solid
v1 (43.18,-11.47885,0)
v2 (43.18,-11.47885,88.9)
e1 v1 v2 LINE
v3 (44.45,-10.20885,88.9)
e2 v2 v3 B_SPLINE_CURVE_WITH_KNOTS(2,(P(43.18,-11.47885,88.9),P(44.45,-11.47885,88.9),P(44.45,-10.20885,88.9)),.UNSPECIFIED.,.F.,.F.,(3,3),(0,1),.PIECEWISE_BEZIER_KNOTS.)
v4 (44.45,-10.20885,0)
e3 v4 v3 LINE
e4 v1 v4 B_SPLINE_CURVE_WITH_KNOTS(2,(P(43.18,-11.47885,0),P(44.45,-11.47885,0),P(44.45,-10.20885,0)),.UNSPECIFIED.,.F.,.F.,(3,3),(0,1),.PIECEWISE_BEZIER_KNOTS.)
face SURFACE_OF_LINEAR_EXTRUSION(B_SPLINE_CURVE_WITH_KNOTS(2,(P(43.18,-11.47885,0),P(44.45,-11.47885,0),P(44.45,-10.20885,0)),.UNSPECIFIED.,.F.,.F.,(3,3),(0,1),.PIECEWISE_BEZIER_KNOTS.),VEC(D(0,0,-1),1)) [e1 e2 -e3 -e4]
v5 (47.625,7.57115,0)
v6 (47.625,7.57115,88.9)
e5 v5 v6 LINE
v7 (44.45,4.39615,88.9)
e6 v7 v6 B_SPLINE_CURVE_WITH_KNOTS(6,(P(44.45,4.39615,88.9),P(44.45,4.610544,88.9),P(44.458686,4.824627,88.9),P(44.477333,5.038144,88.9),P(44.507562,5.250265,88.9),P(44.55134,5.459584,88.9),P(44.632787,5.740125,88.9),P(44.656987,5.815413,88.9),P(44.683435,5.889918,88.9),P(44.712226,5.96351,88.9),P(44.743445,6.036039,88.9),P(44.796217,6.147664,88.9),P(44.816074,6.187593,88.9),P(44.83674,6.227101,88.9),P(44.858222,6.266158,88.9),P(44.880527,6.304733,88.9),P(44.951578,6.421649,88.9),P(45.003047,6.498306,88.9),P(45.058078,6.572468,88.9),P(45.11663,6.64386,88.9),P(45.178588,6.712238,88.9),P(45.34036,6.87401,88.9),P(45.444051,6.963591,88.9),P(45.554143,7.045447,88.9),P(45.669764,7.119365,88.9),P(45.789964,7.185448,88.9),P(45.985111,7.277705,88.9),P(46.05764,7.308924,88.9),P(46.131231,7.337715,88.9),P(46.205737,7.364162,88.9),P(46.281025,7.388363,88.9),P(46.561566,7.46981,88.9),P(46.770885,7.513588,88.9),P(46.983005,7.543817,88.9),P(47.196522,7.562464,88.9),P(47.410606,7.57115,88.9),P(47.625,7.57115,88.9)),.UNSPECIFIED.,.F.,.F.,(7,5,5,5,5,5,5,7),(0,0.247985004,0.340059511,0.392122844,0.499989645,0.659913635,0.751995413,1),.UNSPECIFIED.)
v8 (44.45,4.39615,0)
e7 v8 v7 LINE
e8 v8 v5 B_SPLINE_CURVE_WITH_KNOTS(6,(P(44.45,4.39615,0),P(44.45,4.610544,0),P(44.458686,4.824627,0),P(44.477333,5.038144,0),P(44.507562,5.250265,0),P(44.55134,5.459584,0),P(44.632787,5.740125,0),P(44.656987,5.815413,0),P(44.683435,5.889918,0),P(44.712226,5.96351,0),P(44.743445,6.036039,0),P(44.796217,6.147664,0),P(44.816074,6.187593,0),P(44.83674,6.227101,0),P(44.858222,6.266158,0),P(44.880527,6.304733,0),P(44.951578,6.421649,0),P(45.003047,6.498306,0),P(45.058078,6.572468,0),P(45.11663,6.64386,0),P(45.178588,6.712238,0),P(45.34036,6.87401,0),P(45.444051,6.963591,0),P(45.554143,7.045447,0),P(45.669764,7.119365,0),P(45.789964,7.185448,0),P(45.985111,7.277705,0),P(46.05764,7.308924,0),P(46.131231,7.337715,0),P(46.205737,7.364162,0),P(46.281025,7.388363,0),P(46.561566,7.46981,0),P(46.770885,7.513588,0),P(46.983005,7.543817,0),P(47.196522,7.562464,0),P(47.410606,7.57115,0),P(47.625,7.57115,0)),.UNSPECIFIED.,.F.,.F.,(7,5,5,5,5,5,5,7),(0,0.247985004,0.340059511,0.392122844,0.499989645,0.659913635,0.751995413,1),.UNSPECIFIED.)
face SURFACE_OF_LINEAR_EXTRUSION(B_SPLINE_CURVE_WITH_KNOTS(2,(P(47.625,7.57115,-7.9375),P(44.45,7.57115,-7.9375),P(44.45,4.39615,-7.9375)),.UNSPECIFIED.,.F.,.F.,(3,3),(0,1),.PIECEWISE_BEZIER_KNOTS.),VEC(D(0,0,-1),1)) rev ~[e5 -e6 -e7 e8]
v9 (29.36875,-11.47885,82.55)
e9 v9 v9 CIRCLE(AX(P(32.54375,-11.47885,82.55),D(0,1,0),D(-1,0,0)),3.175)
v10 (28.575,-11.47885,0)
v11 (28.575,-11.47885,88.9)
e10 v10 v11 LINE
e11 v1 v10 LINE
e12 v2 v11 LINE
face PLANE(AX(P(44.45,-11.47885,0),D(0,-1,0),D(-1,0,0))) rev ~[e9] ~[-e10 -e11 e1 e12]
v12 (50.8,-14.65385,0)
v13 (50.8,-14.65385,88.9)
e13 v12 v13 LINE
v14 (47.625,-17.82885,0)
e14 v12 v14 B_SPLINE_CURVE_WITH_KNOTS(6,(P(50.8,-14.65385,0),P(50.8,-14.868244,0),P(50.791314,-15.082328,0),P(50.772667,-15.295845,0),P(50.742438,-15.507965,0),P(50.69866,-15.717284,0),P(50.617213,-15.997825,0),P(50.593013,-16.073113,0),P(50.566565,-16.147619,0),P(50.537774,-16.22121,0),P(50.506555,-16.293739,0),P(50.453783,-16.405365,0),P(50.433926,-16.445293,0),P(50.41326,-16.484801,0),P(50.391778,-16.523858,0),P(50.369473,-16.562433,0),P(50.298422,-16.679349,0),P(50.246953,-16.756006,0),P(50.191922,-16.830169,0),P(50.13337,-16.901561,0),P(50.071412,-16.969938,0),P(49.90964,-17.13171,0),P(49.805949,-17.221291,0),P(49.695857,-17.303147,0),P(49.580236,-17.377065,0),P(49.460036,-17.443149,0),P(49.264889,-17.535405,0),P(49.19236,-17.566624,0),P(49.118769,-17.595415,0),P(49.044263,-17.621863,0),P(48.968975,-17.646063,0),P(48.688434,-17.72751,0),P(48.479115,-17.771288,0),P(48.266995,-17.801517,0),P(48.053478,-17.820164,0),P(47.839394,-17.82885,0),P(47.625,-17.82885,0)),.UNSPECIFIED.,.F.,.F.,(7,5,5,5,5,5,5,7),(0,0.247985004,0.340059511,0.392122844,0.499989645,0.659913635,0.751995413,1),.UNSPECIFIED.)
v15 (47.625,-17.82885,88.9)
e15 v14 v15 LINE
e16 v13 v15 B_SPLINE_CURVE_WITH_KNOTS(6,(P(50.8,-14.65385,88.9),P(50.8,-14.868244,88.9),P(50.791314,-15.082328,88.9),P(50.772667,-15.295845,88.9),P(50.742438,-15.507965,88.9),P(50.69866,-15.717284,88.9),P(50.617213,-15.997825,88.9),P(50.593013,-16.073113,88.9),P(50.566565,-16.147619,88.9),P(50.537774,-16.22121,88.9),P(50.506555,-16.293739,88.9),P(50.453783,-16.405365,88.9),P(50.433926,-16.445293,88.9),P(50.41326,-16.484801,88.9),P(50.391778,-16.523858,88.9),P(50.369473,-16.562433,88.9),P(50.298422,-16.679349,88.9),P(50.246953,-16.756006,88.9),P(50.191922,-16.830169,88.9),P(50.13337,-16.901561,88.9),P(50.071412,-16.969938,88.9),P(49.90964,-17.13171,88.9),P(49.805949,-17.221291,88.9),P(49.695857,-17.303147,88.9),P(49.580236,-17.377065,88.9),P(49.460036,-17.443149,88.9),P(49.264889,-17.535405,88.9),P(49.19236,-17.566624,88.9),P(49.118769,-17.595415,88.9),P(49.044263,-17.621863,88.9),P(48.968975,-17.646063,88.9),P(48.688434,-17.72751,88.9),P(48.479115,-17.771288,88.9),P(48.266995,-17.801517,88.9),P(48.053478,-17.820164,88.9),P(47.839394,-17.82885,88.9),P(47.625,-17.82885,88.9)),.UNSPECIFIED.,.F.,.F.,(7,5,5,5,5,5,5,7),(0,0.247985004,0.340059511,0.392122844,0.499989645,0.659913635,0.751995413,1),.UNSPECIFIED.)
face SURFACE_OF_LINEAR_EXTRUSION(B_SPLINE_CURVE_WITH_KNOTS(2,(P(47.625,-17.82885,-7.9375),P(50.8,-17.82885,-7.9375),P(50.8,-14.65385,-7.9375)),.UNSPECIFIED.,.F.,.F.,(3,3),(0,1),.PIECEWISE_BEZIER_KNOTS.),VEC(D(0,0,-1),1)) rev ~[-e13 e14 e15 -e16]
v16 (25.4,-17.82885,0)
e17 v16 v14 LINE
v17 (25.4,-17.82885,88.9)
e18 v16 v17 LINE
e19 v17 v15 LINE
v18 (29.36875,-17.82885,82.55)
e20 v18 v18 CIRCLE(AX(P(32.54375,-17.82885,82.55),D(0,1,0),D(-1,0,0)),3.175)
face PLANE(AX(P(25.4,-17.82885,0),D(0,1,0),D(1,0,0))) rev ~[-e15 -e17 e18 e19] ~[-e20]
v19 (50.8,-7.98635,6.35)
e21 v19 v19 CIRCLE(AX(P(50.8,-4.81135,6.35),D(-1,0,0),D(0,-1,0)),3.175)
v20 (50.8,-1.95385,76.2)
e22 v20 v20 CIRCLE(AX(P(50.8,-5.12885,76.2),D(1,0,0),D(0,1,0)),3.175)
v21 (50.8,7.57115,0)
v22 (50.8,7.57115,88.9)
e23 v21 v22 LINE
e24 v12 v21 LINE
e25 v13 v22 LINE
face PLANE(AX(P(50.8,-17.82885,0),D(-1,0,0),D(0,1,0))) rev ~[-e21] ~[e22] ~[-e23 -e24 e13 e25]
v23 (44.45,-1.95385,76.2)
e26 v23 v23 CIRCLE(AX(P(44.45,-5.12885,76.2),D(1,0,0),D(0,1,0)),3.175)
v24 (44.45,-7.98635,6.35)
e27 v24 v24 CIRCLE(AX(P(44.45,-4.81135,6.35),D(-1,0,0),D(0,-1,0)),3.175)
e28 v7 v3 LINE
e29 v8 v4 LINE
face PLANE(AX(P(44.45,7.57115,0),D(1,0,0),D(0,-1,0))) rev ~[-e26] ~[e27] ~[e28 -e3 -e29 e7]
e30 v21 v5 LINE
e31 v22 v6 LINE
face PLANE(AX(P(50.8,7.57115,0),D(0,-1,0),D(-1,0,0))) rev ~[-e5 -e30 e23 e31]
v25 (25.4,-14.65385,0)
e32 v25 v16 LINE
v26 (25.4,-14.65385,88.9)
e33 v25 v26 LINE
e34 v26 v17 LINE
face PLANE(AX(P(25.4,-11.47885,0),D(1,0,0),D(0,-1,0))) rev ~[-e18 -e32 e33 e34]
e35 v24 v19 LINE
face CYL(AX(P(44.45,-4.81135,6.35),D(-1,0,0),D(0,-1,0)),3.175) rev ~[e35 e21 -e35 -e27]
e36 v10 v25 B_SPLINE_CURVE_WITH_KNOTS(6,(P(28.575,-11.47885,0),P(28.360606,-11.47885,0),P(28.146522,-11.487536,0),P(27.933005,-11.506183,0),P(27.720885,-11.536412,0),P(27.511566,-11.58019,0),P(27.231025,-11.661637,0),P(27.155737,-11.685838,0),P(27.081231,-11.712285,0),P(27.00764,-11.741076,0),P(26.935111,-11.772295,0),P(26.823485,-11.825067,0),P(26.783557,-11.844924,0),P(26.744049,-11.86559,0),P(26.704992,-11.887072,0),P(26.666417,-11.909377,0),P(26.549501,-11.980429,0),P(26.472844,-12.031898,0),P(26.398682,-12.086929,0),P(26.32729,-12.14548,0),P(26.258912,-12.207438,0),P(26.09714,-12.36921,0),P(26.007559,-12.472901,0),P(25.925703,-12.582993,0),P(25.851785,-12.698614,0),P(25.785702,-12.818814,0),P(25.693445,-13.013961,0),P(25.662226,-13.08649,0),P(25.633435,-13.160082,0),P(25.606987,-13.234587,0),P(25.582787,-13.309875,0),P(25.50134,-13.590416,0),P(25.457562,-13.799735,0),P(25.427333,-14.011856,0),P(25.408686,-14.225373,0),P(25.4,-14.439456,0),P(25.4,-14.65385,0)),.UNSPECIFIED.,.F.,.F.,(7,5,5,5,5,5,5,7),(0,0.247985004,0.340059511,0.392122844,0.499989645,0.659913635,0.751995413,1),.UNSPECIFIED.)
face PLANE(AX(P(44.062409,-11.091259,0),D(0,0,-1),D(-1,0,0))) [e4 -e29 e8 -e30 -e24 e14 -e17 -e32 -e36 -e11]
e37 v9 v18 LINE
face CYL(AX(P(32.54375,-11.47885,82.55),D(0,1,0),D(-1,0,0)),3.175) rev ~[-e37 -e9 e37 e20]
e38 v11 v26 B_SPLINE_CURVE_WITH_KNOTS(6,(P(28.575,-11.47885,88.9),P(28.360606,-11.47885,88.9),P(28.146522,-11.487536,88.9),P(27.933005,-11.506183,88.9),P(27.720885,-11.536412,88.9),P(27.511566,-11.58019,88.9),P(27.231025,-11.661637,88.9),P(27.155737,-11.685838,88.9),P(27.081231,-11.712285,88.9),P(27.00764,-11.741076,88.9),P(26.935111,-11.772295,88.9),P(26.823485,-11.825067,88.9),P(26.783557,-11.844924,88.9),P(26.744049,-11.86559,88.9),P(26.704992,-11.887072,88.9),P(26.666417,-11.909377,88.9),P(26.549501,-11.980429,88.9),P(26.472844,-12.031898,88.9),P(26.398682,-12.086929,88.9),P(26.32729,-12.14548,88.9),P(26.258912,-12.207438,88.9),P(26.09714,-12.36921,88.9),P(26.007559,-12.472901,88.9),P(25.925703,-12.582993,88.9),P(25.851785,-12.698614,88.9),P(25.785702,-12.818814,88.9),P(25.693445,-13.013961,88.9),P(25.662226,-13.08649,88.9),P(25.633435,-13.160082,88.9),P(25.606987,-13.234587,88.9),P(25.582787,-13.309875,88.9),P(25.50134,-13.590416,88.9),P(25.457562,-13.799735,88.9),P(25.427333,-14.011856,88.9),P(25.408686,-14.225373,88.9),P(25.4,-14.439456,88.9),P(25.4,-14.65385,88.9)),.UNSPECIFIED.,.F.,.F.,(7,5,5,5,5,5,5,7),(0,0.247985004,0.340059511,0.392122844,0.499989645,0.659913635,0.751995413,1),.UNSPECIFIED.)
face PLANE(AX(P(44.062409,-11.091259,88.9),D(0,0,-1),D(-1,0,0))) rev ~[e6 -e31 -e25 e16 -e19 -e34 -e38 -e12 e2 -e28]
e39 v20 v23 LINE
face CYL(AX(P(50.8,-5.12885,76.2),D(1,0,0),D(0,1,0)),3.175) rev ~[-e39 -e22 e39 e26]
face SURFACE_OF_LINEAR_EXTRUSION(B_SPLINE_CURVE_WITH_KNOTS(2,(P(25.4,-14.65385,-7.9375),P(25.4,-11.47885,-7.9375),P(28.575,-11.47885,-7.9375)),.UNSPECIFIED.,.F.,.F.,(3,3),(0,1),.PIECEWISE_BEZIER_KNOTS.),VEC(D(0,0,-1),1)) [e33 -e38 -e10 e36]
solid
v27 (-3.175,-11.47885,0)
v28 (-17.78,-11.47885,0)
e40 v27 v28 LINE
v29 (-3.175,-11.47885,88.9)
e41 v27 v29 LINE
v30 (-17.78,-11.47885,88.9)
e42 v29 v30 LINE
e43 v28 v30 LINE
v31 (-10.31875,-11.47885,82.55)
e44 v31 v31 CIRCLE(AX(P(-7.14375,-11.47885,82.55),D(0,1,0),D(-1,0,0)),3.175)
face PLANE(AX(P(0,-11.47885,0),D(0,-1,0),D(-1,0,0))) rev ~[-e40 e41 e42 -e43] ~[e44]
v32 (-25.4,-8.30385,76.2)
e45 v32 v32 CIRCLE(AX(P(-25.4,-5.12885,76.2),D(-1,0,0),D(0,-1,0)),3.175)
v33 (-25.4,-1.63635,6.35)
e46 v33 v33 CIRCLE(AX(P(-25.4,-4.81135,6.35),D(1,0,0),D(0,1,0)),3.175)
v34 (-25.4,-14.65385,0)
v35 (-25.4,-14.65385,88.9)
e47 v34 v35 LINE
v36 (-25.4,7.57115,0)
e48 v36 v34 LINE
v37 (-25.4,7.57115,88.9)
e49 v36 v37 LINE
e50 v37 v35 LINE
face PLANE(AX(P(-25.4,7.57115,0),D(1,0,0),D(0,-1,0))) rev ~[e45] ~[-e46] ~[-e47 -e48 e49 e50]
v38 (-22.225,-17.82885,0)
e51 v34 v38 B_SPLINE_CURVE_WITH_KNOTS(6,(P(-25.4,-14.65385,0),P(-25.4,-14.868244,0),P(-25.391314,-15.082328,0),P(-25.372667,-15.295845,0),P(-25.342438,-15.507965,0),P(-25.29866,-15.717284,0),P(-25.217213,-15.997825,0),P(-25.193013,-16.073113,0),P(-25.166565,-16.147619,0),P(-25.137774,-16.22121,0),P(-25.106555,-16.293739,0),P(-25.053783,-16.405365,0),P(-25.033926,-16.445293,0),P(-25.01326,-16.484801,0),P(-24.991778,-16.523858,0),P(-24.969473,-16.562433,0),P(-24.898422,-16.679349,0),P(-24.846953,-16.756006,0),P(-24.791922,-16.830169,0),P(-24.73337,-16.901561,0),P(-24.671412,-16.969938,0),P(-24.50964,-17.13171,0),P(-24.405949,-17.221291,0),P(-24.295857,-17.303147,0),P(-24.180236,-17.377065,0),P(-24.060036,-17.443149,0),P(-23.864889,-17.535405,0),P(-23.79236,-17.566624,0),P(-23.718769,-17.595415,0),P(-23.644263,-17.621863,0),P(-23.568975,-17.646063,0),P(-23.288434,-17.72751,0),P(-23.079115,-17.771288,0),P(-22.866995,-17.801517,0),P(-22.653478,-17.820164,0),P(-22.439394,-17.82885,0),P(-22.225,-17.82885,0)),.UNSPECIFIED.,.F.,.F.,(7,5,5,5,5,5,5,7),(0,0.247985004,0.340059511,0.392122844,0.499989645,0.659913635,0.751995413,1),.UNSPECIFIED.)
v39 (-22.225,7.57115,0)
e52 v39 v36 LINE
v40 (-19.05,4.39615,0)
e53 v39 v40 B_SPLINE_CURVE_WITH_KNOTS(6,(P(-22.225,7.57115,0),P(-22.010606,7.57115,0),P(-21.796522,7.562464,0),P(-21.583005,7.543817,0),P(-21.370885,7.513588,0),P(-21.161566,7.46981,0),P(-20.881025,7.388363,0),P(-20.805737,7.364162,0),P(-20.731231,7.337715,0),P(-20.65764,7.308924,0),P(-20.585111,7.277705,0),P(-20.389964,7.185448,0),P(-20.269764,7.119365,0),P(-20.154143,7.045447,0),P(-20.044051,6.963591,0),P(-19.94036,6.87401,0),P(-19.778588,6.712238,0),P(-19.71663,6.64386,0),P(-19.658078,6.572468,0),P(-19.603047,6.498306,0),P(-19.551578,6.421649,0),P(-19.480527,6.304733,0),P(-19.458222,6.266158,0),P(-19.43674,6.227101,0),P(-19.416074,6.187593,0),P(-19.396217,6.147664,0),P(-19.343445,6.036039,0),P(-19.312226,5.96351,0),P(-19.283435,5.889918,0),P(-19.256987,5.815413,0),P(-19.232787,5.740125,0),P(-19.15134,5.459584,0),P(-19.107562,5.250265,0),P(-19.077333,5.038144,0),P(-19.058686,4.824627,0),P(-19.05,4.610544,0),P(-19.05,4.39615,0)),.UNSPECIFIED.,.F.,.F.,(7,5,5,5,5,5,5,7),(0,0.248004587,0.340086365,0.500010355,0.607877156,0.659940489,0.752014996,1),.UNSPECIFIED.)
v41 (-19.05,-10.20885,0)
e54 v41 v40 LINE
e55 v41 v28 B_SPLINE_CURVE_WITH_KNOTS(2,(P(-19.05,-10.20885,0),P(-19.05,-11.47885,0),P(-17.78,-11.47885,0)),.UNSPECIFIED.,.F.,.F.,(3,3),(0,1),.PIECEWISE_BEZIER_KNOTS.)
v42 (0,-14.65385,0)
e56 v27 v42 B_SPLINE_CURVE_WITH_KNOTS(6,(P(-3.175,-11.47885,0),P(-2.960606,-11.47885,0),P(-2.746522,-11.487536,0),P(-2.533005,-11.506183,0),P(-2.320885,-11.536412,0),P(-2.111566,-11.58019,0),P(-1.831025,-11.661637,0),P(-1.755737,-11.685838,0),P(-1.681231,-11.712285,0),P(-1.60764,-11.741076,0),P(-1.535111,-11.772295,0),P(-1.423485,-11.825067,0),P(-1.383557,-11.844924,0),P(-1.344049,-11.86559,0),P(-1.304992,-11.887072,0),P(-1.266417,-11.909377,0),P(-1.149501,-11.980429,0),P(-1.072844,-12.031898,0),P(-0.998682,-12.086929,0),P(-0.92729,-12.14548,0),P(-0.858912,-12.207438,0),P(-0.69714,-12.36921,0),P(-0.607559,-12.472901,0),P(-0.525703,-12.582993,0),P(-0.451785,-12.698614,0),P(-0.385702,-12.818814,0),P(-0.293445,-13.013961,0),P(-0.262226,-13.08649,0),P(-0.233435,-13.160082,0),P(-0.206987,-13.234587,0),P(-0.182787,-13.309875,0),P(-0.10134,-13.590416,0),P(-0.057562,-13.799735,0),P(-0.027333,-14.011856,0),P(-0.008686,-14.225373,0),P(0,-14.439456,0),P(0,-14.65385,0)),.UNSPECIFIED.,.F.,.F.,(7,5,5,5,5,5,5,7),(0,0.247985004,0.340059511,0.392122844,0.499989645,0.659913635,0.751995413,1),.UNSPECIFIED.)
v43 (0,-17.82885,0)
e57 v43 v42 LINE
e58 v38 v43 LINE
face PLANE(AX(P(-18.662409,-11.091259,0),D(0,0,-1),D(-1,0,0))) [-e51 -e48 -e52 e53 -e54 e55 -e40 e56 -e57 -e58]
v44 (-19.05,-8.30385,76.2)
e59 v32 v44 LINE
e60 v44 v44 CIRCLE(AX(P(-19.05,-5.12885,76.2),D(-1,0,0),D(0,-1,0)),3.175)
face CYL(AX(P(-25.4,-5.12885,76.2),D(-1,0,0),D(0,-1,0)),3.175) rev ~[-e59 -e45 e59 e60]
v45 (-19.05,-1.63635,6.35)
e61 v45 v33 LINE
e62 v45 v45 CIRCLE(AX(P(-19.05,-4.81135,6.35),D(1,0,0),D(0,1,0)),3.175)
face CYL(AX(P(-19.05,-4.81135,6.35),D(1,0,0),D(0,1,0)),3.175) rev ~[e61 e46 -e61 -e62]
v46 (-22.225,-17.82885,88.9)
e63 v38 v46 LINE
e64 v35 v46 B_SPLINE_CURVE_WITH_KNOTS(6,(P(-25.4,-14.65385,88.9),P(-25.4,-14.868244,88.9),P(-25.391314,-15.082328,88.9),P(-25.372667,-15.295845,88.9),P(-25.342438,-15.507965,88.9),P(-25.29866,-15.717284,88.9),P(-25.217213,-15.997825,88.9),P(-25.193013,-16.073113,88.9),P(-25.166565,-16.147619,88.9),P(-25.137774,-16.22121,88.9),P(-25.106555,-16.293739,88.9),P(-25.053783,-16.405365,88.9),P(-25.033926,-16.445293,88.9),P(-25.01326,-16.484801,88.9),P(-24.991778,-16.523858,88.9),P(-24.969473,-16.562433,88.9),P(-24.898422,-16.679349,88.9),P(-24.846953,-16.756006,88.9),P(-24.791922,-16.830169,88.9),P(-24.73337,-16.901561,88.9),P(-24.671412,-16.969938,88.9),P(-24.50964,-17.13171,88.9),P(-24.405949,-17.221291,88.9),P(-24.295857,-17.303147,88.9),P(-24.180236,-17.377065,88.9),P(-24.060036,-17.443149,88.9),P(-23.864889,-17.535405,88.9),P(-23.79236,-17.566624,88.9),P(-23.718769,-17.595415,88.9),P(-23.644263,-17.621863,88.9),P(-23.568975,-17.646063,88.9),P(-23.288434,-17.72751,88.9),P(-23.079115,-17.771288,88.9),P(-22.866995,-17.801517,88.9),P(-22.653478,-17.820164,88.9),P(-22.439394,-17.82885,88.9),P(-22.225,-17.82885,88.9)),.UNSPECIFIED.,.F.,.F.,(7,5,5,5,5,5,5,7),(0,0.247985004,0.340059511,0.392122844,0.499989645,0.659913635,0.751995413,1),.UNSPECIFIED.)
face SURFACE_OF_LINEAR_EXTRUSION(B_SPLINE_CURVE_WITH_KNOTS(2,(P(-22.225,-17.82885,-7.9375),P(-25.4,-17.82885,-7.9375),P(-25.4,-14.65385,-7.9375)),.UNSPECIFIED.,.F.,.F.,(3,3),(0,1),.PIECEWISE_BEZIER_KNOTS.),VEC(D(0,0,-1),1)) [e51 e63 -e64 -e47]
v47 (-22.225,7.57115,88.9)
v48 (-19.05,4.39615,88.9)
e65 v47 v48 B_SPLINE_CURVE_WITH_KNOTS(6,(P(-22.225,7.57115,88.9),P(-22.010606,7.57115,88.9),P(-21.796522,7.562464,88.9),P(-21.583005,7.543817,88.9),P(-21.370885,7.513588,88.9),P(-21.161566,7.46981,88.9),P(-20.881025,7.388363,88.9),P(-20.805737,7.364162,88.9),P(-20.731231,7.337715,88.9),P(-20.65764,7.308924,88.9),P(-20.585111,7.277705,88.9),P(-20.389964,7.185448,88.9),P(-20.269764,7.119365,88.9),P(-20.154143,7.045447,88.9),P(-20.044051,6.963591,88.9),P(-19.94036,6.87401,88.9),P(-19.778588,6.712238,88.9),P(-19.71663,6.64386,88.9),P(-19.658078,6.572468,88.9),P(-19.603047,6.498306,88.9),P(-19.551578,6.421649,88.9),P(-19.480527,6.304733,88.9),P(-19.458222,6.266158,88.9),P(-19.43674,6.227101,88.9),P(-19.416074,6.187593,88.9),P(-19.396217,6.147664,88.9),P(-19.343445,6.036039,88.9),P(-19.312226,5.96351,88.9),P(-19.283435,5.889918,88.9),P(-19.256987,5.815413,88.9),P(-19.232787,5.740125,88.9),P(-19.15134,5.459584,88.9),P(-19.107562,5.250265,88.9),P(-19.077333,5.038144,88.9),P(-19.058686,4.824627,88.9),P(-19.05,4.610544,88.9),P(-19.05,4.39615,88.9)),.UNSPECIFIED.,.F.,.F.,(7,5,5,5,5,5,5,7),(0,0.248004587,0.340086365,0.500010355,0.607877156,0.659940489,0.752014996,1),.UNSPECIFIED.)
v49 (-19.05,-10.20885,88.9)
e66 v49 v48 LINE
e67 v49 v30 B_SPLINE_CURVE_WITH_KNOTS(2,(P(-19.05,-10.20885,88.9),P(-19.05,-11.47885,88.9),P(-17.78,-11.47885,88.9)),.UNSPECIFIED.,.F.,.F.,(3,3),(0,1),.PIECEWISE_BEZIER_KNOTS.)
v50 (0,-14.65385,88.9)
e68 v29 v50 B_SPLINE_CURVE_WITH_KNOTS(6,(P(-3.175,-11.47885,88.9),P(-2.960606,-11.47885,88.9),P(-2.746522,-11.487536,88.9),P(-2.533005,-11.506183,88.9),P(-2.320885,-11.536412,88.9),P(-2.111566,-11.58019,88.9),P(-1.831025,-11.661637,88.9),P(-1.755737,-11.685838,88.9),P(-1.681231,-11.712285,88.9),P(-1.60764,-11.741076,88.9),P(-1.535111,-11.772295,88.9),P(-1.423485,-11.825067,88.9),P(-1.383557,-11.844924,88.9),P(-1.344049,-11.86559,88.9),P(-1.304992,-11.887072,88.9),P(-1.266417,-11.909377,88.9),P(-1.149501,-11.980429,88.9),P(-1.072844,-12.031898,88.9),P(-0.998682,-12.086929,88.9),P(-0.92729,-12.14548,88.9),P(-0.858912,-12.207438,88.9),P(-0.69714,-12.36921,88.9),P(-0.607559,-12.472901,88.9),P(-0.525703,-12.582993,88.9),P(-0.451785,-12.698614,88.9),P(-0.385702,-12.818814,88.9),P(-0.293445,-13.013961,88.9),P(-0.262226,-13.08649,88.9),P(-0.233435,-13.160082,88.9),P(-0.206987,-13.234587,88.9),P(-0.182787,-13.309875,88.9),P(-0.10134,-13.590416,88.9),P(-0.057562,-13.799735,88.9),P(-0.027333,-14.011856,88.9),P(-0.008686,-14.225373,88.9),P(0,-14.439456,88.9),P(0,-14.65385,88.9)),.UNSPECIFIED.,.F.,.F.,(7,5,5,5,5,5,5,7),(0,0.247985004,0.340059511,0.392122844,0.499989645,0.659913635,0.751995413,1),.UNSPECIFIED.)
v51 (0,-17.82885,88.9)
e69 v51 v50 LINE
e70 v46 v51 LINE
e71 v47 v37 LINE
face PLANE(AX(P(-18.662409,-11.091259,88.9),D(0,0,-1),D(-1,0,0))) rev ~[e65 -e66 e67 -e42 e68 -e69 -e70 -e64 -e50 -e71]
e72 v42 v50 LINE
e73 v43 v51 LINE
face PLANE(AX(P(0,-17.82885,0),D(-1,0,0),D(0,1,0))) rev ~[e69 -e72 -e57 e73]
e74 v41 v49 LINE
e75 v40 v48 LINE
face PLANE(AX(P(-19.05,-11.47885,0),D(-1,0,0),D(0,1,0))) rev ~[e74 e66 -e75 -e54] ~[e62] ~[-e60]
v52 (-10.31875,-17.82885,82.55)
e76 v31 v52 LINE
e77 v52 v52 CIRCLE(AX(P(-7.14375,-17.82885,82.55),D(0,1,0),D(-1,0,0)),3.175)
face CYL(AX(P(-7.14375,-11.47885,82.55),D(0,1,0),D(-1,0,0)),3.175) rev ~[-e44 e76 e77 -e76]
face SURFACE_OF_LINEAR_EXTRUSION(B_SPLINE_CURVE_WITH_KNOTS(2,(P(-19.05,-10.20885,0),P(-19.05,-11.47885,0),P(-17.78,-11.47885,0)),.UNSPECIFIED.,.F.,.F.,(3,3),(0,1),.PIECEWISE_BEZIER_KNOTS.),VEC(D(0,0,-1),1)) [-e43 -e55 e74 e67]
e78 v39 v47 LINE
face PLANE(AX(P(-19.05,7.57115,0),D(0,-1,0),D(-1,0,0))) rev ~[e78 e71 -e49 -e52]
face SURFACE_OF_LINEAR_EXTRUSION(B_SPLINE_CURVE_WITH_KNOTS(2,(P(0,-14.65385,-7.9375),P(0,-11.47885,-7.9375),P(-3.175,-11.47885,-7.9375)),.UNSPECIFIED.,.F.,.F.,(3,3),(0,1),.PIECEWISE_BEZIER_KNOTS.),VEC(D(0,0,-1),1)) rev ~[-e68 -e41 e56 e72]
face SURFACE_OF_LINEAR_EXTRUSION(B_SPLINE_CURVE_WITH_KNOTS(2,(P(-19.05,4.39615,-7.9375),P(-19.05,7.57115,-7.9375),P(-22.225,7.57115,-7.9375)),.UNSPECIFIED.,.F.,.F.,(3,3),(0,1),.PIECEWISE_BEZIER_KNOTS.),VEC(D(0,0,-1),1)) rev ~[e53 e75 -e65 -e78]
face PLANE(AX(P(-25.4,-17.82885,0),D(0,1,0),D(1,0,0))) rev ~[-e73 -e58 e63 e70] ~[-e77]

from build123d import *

# Parameters (mm, degrees)
F1_DEPTH      = 88.9
F2_T1_DEPTH   = 104.775
F3_T1_DEPTH   = 104.775
F5_DEPTH      = 88.9
F6_T1_DEPTH   = 104.775
F7_T1_DEPTH   = 88.9
F7_2_T1_DEPTH = 88.9
F8_T1_DEPTH   = 104.775
F10_R         = 3.175
F11_DEPTH     = 6.35
F9_R          = 3.175
F12_DEPTH     = 6.35
F14_R         = 3.175
F15_DEPTH     = 6.35
F13_R         = 3.175
F16_DEPTH     = 6.35
F17_R         = 3.175
F19_DEPTH     = 6.35
F18_R         = 3.175
F20_DEPTH     = 6.35


# Not quite as in the source:
# - a fillet or chamfer that OpenCascade refuses, or shapes differently, is made with other operations: its cross-section is extruded or revolved along the edge and cut away or added


with BuildPart() as f1:
    # F0 (on Top) → F1 (new body)
    with BuildSketch(Plane.XY):
        Polygon((-19.05, -11.4788501549), (-19.05, 7.5711498451), (-25.4, 7.5711498451), (-25.4, -17.8288501549), (0, -17.8288501549), (0, -11.4788501549), align=None)
    extrude(amount=F1_DEPTH)

    # F2: fillet of radius 3.175 on 2 edges, made by hand

    # F2_s2 → F2_t1 (cut)
    with BuildSketch(Plane.XY.offset(-7.9375)):
        with BuildLine():
            add(Edge.make_bspline(
                [(-19.05, 4.3961498451), (-19.05, 7.5711498451), (-22.225, 7.5711498451)],
                knots=[0, 0, 0, 1, 1, 1], degree=2, weights=[1, 1, 1]))
            Line((-22.225, 7.5711498451), (-19.05, 7.5711498451))
            Line((-19.05, 7.5711498451), (-19.05, 4.3961498451))
        make_face()
        with BuildLine():
            add(Edge.make_bspline(
                [(0, -14.6538501549), (0, -11.4788501549), (-3.175, -11.4788501549)],
                knots=[0, 0, 0, 1, 1, 1], degree=2, weights=[1, 1, 1]))
            Line((-3.175, -11.4788501549), (0, -11.4788501549))
            Line((0, -11.4788501549), (0, -14.6538501549))
        make_face()
    extrude(amount=F2_T1_DEPTH, mode=Mode.SUBTRACT)

    # F3: fillet of radius 3.175 on 1 edges, made by hand

    # F3_s2 → F3_t1 (cut)
    with BuildSketch(Plane.XY.offset(-7.9375)):
        with BuildLine():
            add(Edge.make_bspline(
                [(-22.225, -17.8288501549), (-25.4, -17.8288501549), (-25.4, -14.6538501549)],
                knots=[0, 0, 0, 1, 1, 1], degree=2, weights=[1, 1, 1]))
            Line((-25.4, -14.6538501549), (-25.4, -17.8288501549))
            Line((-25.4, -17.8288501549), (-22.225, -17.8288501549))
        make_face()
    extrude(amount=F3_T1_DEPTH, mode=Mode.SUBTRACT)

    # F7#2: fillet of radius 1.27 on 1 edges, made by hand

    # F7_2_s2 → F7_2_t1 (join)
    with BuildSketch(Plane.XY):
        with BuildLine():
            add(Edge.make_bspline(
                [(-19.05, -10.2088501549), (-19.05, -11.4788501549), (-17.78, -11.4788501549)],
                knots=[0, 0, 0, 1, 1, 1], degree=2, weights=[1, 1, 1]))
            Line((-17.78, -11.4788501549), (-19.05, -11.4788501549))
            Line((-19.05, -11.4788501549), (-19.05, -10.2088501549))
        make_face()
    extrude(amount=F7_2_T1_DEPTH)

    # F9 (on face) → F12 (cut)
    with BuildSketch(Plane.YZ.offset(-19.05)):
        with Locations((-4.8113501549, 6.35)):
            Circle(F9_R)
    extrude(amount=-F12_DEPTH, mode=Mode.SUBTRACT)

    # F14 (on face) → F15 (cut)
    with BuildSketch(Plane(origin=(-25.4, 0, 0), x_dir=(0, -1, 0), z_dir=(-1, 0, 0))):
        with Locations((5.1288501549, 76.2)):
            Circle(F14_R)
    extrude(amount=-F15_DEPTH, mode=Mode.SUBTRACT)

    # F18 (on face) → F20 (cut)
    with BuildSketch(Plane(origin=(0, -11.4788501549, 0), x_dir=(-1, 0, 0), z_dir=(0, 1, 0))):
        with Locations((7.14375, 82.55)):
            Circle(F18_R)
    extrude(amount=-F20_DEPTH, mode=Mode.SUBTRACT)


with BuildPart() as f5:
    # F4 (on Top) → F5 (new body)
    with BuildSketch(Plane.XY):
        Polygon((25.4, -11.4788501549), (25.4, -17.8288501549), (50.8, -17.8288501549), (50.8, 7.5711498451), (44.45, 7.5711498451), (44.45, -11.4788501549), align=None)
    extrude(amount=F5_DEPTH)

    # F6: fillet of radius 3.175 on 2 edges, made by hand

    # F6_s2 → F6_t1 (cut)
    with BuildSketch(Plane.XY.offset(-7.9375)):
        with BuildLine():
            add(Edge.make_bspline(
                [(25.4, -14.6538501549), (25.4, -11.4788501549), (28.575, -11.4788501549)],
                knots=[0, 0, 0, 1, 1, 1], degree=2, weights=[1, 1, 1]))
            Line((28.575, -11.4788501549), (25.4, -11.4788501549))
            Line((25.4, -11.4788501549), (25.4, -14.6538501549))
        make_face()
        with BuildLine():
            add(Edge.make_bspline(
                [(47.625, 7.5711498451), (44.45, 7.5711498451), (44.45, 4.3961498451)],
                knots=[0, 0, 0, 1, 1, 1], degree=2, weights=[1, 1, 1]))
            Line((44.45, 4.3961498451), (44.45, 7.5711498451))
            Line((44.45, 7.5711498451), (47.625, 7.5711498451))
        make_face()
    extrude(amount=F6_T1_DEPTH, mode=Mode.SUBTRACT)

    # F7: fillet of radius 1.27 on 1 edges, made by hand

    # F7_s2 → F7_t1 (join)
    with BuildSketch(Plane.XY):
        with BuildLine():
            add(Edge.make_bspline(
                [(43.18, -11.4788501549), (44.45, -11.4788501549), (44.45, -10.2088501549)],
                knots=[0, 0, 0, 1, 1, 1], degree=2, weights=[1, 1, 1]))
            Line((44.45, -10.2088501549), (44.45, -11.4788501549))
            Line((44.45, -11.4788501549), (43.18, -11.4788501549))
        make_face()
    extrude(amount=F7_T1_DEPTH)

    # F8: fillet of radius 3.175 on 1 edges, made by hand

    # F8_s2 → F8_t1 (cut)
    with BuildSketch(Plane.XY.offset(-7.9375)):
        with BuildLine():
            add(Edge.make_bspline(
                [(47.625, -17.8288501549), (50.8, -17.8288501549), (50.8, -14.6538501549)],
                knots=[0, 0, 0, 1, 1, 1], degree=2, weights=[1, 1, 1]))
            Line((50.8, -14.6538501549), (50.8, -17.8288501549))
            Line((50.8, -17.8288501549), (47.625, -17.8288501549))
        make_face()
    extrude(amount=F8_T1_DEPTH, mode=Mode.SUBTRACT)

    # F10 (on face) → F11 (cut)
    with BuildSketch(Plane(origin=(44.45, 0, 0), x_dir=(0, -1, 0), z_dir=(-1, 0, 0))):
        with Locations((4.8113501549, 6.35)):
            Circle(F10_R)
    extrude(amount=-F11_DEPTH, mode=Mode.SUBTRACT)

    # F13 (on face) → F16 (cut)
    with BuildSketch(Plane.YZ.offset(50.8)):
        with Locations((-5.1288501549, 76.2)):
            Circle(F13_R)
    extrude(amount=-F16_DEPTH, mode=Mode.SUBTRACT)

    # F17 (on face) → F19 (cut)
    with BuildSketch(Plane(origin=(0, -11.4788501549, 0), x_dir=(-1, 0, 0), z_dir=(0, 1, 0))):
        with Locations((-32.54375, 82.55)):
            Circle(F17_R)
    extrude(amount=-F19_DEPTH, mode=Mode.SUBTRACT)


solid = Compound([f1.part, f5.part])
